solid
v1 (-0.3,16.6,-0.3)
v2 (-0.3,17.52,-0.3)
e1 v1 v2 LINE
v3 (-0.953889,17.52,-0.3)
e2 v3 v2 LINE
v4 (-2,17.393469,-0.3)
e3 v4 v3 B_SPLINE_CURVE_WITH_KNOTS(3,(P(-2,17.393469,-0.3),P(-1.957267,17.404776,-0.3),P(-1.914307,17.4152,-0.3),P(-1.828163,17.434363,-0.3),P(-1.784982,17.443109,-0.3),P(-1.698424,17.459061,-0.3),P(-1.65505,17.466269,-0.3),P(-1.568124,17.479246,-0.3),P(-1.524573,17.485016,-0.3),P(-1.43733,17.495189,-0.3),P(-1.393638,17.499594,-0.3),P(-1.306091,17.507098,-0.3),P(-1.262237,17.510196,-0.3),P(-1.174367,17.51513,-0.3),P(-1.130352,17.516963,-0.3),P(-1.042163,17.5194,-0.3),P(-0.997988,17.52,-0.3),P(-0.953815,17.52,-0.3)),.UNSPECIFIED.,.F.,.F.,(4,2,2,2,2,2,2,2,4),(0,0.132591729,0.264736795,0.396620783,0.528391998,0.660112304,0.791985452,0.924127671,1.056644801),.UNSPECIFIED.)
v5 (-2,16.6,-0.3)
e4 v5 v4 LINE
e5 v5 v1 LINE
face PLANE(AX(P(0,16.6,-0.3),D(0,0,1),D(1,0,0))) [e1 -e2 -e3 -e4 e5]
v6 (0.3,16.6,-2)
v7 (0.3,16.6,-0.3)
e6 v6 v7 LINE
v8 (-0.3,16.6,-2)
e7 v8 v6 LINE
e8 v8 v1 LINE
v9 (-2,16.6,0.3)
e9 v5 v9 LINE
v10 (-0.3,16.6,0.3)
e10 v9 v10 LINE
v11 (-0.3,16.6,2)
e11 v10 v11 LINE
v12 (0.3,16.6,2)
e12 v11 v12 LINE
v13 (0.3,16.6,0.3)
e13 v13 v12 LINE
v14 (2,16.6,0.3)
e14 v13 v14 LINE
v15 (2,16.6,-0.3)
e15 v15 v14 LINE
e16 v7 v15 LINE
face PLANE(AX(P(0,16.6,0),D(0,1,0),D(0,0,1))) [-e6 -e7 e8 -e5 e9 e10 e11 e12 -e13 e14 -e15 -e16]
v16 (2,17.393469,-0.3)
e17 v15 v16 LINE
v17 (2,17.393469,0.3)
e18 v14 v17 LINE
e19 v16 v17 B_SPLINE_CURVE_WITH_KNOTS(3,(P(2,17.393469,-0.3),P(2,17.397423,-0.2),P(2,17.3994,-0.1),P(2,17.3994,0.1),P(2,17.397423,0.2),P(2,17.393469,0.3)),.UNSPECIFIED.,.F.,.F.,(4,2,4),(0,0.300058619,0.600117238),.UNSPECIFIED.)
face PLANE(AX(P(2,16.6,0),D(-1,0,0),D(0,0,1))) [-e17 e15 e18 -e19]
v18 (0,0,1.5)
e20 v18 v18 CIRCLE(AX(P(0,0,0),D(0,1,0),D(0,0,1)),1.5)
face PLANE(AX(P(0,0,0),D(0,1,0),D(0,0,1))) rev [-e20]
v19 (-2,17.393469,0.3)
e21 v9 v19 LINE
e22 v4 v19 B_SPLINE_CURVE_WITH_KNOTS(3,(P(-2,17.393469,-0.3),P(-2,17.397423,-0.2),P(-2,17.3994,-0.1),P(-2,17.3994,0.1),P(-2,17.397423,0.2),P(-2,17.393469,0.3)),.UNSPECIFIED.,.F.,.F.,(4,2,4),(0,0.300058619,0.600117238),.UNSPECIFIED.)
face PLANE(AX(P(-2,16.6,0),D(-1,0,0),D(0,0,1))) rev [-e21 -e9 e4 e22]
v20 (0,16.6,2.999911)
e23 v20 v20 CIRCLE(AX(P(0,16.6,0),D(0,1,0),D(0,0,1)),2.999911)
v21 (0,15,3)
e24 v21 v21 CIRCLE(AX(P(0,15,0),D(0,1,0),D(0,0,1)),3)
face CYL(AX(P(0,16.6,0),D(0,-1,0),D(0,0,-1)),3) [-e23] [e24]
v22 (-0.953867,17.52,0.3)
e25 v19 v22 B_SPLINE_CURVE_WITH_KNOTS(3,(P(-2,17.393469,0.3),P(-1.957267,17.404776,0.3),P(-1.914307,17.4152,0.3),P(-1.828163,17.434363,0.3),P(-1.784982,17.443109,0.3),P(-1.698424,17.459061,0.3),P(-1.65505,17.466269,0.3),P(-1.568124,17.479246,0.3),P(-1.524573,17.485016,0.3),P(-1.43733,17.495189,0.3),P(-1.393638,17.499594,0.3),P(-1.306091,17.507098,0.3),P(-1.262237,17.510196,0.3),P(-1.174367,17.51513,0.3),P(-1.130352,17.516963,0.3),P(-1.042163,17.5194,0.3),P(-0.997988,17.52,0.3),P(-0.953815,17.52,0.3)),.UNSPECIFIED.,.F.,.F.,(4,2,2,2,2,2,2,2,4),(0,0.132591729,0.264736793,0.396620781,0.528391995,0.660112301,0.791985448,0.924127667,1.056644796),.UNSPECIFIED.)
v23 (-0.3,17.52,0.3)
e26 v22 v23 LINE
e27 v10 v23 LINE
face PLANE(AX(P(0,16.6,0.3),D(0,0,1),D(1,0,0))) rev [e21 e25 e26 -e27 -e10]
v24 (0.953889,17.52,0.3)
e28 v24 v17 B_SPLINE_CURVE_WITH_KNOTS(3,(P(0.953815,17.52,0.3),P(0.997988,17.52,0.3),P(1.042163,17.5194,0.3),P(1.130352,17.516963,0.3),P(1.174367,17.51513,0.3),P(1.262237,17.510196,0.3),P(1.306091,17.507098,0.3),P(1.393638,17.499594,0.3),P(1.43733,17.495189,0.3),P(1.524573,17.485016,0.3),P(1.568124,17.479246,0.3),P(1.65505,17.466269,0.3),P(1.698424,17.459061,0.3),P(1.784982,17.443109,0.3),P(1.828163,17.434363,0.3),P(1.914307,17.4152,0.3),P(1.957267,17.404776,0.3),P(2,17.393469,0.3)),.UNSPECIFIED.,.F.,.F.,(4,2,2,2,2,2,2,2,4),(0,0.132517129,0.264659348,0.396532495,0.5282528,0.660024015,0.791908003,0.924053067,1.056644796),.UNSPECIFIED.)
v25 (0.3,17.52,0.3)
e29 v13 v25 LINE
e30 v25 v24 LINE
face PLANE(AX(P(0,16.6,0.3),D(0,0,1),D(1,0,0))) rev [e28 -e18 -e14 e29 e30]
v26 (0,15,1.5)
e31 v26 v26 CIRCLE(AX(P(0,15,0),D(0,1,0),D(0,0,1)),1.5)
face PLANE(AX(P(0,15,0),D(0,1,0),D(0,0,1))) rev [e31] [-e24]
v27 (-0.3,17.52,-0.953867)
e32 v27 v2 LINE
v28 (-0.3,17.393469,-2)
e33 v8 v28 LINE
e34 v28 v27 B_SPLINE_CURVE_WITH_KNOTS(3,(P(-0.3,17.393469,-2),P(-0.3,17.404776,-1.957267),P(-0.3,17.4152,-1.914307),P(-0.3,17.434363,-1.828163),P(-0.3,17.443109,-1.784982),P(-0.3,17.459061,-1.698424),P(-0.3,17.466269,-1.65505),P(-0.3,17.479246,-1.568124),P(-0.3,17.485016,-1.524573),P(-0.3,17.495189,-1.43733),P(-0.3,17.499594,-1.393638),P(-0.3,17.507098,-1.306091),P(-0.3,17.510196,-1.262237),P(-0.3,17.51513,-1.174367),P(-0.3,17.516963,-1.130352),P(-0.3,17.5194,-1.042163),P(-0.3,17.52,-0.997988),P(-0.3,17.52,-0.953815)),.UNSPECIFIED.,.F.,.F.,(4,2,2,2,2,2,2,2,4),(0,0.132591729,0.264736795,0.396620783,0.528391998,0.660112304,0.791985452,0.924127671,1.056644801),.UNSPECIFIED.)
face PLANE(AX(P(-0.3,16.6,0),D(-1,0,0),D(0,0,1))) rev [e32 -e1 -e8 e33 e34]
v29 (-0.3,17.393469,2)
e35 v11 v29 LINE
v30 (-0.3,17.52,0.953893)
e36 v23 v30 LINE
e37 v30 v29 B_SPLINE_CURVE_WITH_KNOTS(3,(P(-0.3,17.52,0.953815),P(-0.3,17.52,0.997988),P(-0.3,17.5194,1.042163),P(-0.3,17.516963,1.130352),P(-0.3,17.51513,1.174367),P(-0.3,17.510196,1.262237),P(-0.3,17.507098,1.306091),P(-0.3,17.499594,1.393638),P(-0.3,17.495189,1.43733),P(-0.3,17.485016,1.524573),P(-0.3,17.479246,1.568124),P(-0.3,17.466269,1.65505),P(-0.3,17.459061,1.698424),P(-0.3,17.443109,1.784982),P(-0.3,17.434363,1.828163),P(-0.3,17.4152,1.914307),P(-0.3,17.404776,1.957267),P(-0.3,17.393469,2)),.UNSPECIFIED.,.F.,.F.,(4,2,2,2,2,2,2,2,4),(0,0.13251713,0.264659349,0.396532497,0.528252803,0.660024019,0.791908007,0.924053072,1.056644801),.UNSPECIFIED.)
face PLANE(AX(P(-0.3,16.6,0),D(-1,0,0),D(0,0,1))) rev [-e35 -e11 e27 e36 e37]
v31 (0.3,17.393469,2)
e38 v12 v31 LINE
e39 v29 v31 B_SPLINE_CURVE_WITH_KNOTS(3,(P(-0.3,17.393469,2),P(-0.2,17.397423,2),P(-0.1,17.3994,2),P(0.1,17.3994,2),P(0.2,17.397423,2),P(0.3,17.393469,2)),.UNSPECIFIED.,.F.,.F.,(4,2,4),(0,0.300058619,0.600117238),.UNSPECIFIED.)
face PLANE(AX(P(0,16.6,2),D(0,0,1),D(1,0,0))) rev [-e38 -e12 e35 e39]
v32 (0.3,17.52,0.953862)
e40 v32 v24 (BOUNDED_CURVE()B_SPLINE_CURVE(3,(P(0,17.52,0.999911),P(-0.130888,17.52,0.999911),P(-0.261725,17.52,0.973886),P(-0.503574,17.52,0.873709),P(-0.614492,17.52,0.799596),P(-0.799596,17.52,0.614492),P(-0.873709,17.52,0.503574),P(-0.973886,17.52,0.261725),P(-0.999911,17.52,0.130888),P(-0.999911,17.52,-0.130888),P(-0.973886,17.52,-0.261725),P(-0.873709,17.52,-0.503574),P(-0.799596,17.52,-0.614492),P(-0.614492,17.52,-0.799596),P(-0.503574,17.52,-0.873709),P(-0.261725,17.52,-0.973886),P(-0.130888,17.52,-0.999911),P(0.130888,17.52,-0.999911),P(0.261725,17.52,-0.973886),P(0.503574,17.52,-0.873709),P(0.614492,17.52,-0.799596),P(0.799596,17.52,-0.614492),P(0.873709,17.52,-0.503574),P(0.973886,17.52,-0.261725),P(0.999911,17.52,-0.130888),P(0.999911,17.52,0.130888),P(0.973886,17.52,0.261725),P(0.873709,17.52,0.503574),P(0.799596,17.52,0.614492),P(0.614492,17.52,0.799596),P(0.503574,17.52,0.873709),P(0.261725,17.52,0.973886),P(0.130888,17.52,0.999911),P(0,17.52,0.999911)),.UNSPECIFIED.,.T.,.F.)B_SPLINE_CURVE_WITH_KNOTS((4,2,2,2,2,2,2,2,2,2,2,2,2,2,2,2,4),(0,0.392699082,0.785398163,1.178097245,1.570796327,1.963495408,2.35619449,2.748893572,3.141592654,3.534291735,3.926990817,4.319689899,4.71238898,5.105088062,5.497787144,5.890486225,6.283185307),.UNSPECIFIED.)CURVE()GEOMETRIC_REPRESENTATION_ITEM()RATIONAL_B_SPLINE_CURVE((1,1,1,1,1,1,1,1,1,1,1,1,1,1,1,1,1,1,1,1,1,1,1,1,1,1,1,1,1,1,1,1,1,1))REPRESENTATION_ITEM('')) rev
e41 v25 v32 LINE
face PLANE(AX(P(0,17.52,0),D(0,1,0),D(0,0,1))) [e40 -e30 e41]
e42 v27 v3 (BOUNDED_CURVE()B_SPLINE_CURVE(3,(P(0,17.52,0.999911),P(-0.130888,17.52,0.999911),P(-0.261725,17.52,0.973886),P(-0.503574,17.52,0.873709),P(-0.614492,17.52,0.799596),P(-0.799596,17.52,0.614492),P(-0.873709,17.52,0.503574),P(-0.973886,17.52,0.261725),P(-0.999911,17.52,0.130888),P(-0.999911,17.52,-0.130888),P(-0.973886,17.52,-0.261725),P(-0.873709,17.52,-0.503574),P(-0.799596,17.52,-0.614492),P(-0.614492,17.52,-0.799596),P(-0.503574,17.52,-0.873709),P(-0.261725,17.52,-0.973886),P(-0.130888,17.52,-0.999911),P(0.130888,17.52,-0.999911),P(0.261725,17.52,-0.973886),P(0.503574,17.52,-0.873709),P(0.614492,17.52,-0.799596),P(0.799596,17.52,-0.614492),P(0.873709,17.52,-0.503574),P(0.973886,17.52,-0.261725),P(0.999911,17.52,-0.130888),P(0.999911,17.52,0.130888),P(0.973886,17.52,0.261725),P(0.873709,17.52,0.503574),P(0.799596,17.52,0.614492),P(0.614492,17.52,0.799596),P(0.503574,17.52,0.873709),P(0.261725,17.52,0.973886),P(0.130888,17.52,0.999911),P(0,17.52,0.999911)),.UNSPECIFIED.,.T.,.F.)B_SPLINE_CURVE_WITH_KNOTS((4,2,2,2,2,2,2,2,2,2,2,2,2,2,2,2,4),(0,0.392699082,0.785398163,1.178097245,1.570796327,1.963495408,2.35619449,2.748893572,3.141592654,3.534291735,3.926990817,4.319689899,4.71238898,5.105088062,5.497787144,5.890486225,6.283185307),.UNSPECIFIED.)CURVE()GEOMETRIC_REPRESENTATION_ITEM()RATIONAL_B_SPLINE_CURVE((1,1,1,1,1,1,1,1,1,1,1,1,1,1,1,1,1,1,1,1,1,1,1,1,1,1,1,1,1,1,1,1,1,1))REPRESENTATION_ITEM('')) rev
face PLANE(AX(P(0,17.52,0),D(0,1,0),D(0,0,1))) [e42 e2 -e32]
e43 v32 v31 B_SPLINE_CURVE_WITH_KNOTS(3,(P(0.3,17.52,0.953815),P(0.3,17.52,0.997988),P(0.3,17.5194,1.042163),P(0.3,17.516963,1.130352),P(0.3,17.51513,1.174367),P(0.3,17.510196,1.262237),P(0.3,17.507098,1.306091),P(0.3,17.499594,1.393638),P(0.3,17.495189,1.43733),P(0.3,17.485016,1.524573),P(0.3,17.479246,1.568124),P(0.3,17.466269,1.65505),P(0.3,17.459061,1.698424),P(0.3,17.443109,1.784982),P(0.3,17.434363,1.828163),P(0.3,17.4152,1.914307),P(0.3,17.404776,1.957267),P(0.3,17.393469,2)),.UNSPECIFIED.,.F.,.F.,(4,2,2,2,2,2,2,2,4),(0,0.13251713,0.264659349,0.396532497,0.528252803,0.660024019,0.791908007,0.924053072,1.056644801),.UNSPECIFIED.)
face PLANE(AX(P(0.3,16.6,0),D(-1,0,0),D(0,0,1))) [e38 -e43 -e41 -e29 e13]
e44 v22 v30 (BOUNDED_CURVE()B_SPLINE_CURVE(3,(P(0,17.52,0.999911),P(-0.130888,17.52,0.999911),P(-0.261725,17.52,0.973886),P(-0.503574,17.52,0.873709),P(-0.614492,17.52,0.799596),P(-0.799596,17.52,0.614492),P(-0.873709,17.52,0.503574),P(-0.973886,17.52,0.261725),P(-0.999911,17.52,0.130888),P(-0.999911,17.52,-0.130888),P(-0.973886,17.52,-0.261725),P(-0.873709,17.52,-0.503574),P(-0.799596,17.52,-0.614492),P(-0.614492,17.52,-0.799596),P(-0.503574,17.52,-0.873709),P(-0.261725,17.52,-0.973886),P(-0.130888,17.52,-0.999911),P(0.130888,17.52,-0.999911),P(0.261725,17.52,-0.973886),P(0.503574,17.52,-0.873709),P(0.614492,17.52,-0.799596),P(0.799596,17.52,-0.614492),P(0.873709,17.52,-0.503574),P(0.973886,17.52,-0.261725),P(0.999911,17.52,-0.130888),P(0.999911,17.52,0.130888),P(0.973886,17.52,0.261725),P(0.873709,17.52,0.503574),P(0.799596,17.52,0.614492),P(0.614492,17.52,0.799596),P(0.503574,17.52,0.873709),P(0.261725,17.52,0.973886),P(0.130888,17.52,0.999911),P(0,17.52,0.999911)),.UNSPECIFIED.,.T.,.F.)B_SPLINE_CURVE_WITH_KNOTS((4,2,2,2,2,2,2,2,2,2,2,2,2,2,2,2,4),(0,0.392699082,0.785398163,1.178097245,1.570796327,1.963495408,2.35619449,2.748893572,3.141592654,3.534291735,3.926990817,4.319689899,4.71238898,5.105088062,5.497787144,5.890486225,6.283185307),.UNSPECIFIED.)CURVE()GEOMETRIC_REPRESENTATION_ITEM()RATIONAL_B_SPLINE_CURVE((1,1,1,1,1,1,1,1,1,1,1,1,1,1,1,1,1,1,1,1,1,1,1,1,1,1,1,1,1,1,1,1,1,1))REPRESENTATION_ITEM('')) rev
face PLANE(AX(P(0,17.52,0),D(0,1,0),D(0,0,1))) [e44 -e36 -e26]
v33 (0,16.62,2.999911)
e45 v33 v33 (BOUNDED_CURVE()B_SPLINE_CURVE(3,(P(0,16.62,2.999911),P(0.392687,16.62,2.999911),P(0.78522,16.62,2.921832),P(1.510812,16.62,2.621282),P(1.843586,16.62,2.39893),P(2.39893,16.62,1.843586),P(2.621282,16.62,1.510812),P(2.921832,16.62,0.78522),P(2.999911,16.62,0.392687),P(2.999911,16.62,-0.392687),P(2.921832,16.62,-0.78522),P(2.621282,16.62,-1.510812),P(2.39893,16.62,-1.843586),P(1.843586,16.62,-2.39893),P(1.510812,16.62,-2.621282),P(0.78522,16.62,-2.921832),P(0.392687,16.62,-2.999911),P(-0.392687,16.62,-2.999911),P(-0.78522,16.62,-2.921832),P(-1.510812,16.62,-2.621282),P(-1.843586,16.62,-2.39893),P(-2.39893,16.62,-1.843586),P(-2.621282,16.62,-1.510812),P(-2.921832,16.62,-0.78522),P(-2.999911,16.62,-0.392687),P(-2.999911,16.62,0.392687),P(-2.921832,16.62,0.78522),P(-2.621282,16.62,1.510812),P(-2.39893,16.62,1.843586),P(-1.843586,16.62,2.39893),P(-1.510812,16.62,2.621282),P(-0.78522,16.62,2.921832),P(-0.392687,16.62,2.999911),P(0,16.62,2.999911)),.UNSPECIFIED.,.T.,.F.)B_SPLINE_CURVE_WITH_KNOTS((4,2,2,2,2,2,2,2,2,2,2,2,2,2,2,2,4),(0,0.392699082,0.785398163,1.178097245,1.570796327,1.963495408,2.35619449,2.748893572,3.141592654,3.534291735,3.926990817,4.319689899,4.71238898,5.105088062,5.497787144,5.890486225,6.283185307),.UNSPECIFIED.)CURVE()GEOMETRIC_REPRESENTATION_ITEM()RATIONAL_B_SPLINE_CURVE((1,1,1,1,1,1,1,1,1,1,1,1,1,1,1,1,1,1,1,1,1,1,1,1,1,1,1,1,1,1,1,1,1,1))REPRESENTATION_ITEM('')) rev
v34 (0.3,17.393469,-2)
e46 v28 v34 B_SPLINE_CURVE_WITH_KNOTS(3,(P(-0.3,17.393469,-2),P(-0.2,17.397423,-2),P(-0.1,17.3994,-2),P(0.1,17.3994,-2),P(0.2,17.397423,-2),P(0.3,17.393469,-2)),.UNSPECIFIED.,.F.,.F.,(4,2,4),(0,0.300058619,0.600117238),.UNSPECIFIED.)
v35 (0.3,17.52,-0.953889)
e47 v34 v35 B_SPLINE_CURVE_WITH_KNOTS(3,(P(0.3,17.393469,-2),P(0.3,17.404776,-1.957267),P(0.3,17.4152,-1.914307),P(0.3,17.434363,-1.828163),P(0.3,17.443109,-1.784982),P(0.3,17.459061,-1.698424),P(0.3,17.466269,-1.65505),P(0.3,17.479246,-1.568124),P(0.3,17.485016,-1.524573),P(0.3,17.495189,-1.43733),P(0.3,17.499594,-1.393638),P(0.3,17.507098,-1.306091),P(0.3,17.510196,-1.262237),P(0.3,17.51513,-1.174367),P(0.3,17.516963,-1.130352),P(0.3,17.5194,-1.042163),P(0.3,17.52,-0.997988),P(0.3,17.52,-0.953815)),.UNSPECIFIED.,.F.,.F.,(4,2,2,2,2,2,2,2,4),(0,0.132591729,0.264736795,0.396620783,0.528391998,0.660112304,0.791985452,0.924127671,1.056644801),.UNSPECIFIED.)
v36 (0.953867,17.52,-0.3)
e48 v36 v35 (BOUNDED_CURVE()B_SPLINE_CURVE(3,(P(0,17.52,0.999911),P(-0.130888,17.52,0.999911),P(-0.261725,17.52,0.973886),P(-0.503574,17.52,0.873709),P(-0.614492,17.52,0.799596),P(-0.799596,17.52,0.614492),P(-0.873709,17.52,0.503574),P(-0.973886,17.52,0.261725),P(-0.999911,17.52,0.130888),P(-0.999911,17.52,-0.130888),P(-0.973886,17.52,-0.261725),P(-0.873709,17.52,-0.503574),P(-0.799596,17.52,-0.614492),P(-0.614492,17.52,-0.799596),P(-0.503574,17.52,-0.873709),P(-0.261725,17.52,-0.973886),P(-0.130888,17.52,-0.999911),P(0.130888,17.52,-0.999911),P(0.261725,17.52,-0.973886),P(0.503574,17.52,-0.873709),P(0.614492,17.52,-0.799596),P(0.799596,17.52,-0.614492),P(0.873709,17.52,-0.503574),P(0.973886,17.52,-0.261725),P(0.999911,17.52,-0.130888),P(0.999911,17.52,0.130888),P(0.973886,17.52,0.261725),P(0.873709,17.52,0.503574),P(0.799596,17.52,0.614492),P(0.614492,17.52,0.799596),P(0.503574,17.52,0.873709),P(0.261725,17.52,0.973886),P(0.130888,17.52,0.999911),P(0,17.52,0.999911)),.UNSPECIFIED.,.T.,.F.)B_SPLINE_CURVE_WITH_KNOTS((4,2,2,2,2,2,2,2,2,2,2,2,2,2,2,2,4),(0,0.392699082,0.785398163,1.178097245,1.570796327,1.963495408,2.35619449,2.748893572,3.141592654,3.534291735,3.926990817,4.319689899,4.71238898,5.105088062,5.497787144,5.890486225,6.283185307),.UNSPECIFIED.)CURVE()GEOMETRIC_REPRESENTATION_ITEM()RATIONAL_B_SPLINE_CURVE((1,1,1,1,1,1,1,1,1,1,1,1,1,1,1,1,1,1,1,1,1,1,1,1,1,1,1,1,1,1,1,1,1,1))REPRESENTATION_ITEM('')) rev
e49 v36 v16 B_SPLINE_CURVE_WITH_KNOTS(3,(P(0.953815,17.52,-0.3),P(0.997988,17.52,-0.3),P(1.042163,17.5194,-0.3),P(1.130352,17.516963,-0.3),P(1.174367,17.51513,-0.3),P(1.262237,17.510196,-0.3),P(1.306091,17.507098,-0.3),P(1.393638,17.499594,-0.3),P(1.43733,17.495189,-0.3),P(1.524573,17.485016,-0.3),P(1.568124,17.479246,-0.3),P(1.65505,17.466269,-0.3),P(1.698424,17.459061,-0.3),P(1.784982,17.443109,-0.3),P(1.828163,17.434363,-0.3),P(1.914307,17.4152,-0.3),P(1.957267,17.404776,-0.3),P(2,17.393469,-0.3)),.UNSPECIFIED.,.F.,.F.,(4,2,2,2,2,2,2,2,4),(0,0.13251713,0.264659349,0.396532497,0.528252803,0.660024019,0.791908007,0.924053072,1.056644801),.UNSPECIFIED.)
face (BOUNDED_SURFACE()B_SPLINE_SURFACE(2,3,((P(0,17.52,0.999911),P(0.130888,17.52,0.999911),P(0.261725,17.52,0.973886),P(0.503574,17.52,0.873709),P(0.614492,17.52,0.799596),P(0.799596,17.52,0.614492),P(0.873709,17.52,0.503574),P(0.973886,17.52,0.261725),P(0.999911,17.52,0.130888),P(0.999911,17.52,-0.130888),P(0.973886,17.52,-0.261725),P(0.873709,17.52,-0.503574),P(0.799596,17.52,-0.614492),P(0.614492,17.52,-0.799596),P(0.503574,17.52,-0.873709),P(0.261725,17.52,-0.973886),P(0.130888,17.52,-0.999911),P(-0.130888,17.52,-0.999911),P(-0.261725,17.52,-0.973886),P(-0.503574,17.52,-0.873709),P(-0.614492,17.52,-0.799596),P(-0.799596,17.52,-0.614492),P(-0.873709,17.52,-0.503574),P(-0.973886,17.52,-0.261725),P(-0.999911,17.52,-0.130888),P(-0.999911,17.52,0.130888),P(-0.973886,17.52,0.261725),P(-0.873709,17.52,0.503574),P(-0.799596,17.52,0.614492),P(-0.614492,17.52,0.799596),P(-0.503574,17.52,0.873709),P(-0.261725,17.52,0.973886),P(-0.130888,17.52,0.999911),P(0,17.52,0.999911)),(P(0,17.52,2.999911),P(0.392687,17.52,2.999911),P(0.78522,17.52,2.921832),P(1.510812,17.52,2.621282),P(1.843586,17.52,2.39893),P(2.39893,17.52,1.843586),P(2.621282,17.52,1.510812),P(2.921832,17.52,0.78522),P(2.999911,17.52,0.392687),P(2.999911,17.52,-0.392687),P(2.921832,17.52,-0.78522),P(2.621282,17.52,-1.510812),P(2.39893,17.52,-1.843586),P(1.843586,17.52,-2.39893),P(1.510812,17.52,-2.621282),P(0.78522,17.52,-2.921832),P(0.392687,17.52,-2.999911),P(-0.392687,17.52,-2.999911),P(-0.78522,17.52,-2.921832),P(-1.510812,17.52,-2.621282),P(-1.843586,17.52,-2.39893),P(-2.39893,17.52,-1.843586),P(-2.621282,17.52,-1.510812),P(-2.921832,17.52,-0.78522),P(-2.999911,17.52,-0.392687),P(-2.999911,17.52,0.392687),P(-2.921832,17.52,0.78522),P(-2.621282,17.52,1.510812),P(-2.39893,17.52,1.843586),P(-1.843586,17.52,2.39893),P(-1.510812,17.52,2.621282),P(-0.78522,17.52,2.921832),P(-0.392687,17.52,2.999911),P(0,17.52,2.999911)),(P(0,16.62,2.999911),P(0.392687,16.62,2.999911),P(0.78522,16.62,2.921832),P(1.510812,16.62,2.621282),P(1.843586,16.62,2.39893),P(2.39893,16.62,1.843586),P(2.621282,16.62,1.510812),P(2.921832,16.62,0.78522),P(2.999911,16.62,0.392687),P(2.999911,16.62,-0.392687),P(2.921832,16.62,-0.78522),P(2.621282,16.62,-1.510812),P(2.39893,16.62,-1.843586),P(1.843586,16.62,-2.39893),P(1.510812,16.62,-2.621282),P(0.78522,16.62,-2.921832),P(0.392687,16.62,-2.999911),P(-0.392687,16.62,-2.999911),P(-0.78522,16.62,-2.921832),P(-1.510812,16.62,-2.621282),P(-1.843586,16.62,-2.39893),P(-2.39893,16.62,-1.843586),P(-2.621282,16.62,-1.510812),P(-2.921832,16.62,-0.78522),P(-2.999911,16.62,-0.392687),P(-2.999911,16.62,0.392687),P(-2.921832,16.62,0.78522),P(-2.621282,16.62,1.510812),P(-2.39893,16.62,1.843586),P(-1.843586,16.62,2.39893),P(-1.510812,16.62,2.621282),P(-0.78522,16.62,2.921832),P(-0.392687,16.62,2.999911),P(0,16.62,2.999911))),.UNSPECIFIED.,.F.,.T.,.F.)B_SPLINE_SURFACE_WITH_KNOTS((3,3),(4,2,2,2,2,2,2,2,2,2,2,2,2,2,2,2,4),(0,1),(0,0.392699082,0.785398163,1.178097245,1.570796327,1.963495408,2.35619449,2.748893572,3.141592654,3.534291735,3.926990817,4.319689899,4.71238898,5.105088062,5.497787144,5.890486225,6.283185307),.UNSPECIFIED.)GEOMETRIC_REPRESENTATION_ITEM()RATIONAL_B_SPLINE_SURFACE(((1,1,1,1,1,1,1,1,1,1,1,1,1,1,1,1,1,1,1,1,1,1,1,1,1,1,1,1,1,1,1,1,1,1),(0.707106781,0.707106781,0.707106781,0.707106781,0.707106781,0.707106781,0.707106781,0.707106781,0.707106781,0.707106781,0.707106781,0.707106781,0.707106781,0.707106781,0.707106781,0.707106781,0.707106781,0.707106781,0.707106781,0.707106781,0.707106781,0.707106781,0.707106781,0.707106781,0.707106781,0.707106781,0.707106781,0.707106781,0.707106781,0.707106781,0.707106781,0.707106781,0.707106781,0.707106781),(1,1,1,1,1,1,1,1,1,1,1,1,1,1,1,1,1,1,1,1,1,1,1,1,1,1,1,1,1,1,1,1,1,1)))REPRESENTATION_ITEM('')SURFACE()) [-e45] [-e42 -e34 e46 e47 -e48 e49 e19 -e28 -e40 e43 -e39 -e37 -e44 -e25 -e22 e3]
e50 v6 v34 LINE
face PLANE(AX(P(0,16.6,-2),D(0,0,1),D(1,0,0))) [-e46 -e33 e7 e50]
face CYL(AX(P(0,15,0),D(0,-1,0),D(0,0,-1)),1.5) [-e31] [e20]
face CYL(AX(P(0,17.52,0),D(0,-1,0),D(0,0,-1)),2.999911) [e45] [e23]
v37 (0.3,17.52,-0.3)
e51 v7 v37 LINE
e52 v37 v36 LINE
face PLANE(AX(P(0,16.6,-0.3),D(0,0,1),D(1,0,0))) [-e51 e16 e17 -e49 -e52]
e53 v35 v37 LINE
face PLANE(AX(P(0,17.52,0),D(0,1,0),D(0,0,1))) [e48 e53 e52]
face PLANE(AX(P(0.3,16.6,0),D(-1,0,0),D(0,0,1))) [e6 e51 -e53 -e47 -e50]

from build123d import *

# Parameters (mm, degrees)
SKICA1_R                 = 1.5
P_IDAT_VYSUNUT_M1_DEPTH  = 15
SKICA2_R                 = 3
P_IDAT_VYSUNUT_M2_DEPTH  = 1.6
SKICA3_R                 = 2.999911278
P_IDAT_VYSUNUT_M3_DEPTH  = 0.92
ZAOBLIT1_SIZE            = 0.9
ZAOBLIT1_SIZE_2          = 2
SKICA4_W                 = 0.6
SKICA4_H                 = 4
SKICA4_W_2               = 4
SKICA4_H_2               = 0.6
ODEBRAT_VYSUNUT_M1_DEPTH = 0.92


with BuildPart() as part:
    # Skica1 → Přidat vysunutím1 (new body)
    with BuildSketch(Plane(origin=(0, 0, 0), x_dir=(1, 0, 0), z_dir=(0, 1, 0))):
        with Locations(Location((0, 0, 0), (0, 0, 270))):
            Circle(SKICA1_R)
    extrude(amount=P_IDAT_VYSUNUT_M1_DEPTH)

    # Skica2 → Přidat vysunutím2 (add)
    with BuildSketch(Plane(origin=(0, 15, 0), x_dir=(1, 0, 0), z_dir=(0, 1, 0))):
        with Locations(Location((0, 0, 0), (0, 0, 270))):
            Circle(SKICA2_R)
    extrude(amount=P_IDAT_VYSUNUT_M2_DEPTH)

    # Skica3 → Přidat vysunutím3 (add)
    with BuildSketch(Plane(origin=(0, 16.6, 0), x_dir=(1, 0, 0), z_dir=(0, 1, 0))):
        with Locations(Location((0, 0, 0), (0, 0, 270))):
            Circle(SKICA3_R)
    extrude(amount=P_IDAT_VYSUNUT_M3_DEPTH)

    # Zaoblit1
    # an asymmetric fillet: 2, 0.9 mm, written as the material it takes off along each edge
    with BuildSketch(Plane(origin=(0, 17.52, 0), x_dir=(0, 0, 1), z_dir=(-1, 0, 0))) as zaoblit1_piece_1:
        with BuildLine():
            Bezier((2.999911278, -ZAOBLIT1_SIZE), (2.999911278, 0), (2.999911278 - ZAOBLIT1_SIZE_2, 0), weights=[1, 0.707106781, 1])
            Line((2.999911278 - ZAOBLIT1_SIZE_2, 0), (2.999911278, 0))
            Line((2.999911278, 0), (2.999911278, -ZAOBLIT1_SIZE))
        make_face()
    revolve(axis=Axis((0, 17.52, 0), (0, 1, 0)), mode=Mode.SUBTRACT)

    # Skica4 → Odebrat vysunutím1 (cut)
    with BuildSketch(Plane(origin=(0, 17.52, 0), x_dir=(1, 0, 0), z_dir=(0, 1, 0))):
        Rectangle(SKICA4_W, SKICA4_H)
        Rectangle(SKICA4_W_2, SKICA4_H_2)
    extrude(amount=-ODEBRAT_VYSUNUT_M1_DEPTH, mode=Mode.SUBTRACT)


solid = part.part
